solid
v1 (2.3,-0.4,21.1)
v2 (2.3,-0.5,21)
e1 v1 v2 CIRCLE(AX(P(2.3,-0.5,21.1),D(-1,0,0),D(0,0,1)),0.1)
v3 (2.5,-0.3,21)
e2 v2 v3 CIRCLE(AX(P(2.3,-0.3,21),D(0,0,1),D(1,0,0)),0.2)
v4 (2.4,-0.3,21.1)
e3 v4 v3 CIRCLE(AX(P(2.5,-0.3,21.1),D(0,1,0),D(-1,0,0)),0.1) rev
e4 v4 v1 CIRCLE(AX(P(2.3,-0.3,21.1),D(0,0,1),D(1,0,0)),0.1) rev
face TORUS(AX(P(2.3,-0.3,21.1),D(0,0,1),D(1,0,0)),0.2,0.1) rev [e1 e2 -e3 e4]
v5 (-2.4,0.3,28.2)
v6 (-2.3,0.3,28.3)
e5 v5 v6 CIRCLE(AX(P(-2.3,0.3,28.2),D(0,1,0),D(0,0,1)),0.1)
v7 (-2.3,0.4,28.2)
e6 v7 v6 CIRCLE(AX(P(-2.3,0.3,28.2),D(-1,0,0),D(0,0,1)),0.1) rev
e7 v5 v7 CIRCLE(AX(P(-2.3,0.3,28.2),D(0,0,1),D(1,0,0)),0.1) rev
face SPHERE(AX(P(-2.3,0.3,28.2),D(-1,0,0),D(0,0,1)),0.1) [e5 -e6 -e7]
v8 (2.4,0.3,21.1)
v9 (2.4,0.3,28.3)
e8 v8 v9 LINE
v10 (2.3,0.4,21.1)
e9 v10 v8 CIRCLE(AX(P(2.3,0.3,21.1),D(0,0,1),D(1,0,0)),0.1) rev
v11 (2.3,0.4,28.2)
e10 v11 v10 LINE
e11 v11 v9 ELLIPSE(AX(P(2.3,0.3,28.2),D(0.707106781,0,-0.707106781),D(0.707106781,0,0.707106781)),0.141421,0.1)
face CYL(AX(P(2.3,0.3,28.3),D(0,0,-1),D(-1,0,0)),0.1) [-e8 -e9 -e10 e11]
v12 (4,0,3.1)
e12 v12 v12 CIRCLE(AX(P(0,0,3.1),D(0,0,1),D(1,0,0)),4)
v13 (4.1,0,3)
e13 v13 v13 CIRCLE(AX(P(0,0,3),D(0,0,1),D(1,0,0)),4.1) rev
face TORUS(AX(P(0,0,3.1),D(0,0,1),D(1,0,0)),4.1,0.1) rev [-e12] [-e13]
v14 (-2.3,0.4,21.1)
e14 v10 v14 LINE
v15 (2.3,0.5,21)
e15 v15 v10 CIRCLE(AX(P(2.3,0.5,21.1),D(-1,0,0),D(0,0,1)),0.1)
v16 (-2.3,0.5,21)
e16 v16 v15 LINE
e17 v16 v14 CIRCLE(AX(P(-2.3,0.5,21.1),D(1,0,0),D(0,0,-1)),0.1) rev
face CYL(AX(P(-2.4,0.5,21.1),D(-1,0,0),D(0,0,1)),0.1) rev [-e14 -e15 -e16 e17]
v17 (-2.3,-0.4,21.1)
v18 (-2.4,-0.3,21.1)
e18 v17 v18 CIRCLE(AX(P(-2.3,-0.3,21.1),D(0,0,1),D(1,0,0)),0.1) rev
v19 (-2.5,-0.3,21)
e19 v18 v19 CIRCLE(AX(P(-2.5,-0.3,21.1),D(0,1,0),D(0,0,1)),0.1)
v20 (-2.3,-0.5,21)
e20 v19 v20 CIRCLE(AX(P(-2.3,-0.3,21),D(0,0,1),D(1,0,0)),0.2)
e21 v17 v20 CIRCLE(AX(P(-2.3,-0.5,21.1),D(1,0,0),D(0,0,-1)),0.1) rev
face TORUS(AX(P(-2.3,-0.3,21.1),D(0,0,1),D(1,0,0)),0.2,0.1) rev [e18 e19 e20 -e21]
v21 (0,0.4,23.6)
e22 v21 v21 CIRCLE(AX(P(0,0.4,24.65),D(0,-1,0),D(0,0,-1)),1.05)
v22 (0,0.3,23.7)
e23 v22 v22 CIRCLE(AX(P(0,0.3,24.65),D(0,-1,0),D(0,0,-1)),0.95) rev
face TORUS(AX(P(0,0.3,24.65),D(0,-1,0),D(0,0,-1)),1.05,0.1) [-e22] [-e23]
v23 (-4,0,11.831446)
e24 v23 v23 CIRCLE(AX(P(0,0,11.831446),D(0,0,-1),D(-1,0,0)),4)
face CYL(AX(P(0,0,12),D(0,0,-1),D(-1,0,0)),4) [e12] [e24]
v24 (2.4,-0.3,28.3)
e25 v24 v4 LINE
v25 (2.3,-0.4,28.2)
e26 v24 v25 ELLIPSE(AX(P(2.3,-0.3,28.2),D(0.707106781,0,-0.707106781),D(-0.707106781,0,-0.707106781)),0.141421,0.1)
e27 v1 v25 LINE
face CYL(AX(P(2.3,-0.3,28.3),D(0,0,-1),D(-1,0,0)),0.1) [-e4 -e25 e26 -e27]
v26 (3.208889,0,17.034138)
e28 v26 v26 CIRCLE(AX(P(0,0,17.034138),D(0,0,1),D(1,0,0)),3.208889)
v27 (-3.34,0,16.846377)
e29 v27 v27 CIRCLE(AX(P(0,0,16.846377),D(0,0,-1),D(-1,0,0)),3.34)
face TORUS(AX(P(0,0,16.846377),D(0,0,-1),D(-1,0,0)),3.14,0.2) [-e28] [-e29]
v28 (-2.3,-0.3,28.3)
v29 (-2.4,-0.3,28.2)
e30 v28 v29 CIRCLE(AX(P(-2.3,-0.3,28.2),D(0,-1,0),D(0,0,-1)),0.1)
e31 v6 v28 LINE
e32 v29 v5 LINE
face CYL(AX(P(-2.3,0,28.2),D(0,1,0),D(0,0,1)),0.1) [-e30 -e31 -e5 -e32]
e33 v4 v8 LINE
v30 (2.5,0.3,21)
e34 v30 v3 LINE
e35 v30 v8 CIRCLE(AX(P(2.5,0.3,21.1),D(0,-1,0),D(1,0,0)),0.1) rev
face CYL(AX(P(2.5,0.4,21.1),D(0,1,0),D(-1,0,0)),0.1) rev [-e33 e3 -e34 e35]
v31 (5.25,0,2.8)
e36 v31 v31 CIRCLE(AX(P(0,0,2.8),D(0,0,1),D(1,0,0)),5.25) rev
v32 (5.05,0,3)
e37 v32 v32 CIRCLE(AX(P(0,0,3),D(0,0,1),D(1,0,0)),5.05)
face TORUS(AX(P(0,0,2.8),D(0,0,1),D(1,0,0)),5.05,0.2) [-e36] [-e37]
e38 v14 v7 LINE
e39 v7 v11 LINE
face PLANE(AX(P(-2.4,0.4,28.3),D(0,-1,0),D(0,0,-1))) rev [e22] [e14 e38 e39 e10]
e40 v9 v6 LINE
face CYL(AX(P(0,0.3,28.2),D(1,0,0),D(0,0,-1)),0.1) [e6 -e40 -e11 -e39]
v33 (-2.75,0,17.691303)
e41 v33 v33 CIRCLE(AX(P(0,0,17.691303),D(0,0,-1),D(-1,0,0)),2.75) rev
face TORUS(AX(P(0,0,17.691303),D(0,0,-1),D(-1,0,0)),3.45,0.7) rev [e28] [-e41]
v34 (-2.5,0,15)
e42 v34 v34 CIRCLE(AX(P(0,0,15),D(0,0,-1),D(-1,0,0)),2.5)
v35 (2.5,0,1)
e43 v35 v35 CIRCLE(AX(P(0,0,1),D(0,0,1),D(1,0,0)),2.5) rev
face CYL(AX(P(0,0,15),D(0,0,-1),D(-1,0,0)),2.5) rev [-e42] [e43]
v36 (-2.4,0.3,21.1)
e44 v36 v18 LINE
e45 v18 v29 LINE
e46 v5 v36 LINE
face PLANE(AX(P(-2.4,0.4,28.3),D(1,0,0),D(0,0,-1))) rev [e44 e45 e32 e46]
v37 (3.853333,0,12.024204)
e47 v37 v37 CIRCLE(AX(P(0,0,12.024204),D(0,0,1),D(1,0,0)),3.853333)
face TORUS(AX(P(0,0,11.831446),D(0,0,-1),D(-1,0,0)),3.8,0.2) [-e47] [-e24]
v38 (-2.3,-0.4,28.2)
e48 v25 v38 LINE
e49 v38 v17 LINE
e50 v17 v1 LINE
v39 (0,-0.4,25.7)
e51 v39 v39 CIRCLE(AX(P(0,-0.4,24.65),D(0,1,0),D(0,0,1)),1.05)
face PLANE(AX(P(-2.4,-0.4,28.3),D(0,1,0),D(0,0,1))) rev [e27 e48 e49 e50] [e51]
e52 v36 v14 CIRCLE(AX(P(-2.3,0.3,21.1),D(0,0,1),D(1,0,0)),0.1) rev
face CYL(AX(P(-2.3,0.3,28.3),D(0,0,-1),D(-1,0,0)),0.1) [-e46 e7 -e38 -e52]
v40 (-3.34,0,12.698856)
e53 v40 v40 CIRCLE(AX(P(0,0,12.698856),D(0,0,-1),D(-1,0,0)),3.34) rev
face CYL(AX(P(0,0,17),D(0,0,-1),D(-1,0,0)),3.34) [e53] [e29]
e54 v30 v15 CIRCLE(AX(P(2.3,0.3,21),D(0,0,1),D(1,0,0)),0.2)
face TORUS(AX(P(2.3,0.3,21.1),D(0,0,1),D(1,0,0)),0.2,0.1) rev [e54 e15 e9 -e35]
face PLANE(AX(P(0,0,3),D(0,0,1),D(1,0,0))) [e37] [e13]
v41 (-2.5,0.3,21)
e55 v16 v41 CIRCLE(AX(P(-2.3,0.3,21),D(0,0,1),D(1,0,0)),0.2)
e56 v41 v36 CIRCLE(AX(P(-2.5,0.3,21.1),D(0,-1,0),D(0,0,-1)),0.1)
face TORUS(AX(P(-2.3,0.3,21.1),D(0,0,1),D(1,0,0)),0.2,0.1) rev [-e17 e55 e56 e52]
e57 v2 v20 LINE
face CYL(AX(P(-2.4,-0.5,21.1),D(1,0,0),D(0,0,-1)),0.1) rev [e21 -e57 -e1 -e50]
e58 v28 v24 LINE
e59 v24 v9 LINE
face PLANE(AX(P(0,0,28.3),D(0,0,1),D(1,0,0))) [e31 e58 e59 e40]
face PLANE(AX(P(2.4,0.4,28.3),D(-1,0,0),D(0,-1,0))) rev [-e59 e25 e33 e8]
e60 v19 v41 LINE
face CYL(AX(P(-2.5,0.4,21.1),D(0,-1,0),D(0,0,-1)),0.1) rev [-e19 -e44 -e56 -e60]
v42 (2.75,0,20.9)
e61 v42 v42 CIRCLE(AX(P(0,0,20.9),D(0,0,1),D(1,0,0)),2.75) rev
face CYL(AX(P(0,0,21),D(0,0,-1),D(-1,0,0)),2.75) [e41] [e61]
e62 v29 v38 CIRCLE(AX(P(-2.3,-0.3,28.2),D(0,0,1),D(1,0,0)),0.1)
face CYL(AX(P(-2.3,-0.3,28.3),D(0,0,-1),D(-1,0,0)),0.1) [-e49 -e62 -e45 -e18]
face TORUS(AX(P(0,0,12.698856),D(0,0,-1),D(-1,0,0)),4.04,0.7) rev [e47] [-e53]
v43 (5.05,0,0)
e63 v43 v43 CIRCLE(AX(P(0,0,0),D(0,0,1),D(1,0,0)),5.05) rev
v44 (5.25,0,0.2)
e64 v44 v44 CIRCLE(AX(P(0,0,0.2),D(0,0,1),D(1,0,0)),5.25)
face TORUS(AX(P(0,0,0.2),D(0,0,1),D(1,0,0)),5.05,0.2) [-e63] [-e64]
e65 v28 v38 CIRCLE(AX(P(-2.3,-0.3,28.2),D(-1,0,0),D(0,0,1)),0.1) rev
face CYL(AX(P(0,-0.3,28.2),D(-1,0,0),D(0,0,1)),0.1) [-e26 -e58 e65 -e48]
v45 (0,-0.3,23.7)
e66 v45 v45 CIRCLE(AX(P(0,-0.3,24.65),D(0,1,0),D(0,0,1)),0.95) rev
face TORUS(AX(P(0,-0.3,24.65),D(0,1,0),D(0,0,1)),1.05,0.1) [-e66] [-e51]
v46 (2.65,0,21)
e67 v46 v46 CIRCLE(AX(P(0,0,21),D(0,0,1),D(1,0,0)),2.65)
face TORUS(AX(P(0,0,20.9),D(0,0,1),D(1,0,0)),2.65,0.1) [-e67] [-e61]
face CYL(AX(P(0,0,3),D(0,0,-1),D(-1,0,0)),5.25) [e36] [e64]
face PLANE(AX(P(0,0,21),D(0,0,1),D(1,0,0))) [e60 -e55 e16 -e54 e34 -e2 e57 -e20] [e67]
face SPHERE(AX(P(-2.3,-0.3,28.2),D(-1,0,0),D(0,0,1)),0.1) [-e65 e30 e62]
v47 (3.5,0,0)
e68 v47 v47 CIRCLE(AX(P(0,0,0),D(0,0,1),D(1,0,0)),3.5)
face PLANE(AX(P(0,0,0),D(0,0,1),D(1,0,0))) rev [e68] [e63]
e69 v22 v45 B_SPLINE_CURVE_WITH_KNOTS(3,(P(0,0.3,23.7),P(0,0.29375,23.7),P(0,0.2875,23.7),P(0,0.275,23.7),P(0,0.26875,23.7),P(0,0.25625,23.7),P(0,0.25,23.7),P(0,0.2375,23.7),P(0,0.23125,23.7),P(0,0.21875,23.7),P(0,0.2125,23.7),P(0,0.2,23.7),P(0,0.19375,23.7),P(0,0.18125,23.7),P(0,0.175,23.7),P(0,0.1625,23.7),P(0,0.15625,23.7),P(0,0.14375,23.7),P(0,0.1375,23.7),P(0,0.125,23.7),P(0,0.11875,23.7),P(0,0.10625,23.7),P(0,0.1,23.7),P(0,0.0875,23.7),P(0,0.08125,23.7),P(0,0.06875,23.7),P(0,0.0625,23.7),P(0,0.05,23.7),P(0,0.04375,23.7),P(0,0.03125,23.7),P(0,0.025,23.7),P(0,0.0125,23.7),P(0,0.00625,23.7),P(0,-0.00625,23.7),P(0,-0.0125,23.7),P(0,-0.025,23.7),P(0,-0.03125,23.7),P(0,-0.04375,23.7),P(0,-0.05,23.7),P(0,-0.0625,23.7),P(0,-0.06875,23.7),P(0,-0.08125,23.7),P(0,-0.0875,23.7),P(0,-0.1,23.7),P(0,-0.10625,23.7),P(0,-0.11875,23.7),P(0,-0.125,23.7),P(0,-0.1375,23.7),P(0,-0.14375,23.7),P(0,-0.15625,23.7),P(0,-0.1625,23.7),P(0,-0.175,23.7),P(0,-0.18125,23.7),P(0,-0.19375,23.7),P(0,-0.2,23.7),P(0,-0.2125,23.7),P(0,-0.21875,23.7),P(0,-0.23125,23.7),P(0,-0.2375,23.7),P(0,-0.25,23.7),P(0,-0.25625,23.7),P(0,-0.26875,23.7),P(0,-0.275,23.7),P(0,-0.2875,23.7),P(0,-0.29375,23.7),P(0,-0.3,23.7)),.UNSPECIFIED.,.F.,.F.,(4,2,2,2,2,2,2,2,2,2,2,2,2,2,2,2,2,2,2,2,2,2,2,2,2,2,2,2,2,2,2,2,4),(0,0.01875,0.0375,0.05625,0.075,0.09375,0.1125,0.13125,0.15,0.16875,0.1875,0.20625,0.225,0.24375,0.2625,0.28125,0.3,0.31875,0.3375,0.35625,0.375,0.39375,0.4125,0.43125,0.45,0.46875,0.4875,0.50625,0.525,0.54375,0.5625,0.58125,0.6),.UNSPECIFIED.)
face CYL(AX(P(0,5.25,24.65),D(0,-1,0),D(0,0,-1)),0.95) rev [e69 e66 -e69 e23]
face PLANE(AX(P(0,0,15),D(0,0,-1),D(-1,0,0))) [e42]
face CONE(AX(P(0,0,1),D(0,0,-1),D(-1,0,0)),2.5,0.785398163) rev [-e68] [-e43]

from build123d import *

# Parameters (mm, degrees)
SKETCH2_R           = 5.25
BOSS_EXTRUDE1_DEPTH = 3
SKETCH3_R           = 4
BOSS_EXTRUDE2_DEPTH = 9
SKETCH4_R           = 3.34
BOSS_EXTRUDE3_DEPTH = 5
SKETCH5_R           = 2.75
BOSS_EXTRUDE4_DEPTH = 4
SKETCH6_W           = 4.8
SKETCH6_H           = 0.8
BOSS_EXTRUDE5_DEPTH = 7.3
SKETCH7_R           = 0.95
CUT_EXTRUDE1_DEPTH  = 30.332149597
SKETCH8_R           = 2.5
CUT_EXTRUDE2_DEPTH  = 15
FILLET1_R           = 0.1
FILLET2_R           = 0.1
FILLET3_R           = 0.7
FILLET5_R           = 0.2
FILLET6_R           = 0.2
CHAMFER1_SIZE       = 1


with BuildPart() as part:
    # Sketch2 → Boss-Extrude1 (new body)
    with BuildSketch(Plane.XY):
        Circle(SKETCH2_R)
    extrude(amount=BOSS_EXTRUDE1_DEPTH)

    # Sketch3 → Boss-Extrude2 (add)
    with BuildSketch(Plane.XY.offset(3)):
        Circle(SKETCH3_R)
    extrude(amount=BOSS_EXTRUDE2_DEPTH)

    # Sketch4 → Boss-Extrude3 (add)
    with BuildSketch(Plane.XY.offset(12)):
        Circle(SKETCH4_R)
    extrude(amount=BOSS_EXTRUDE3_DEPTH)

    # Sketch5 → Boss-Extrude4 (add)
    with BuildSketch(Plane.XY.offset(17)):
        Circle(SKETCH5_R)
    extrude(amount=BOSS_EXTRUDE4_DEPTH)

    # Sketch6 → Boss-Extrude5 (add)
    with BuildSketch(Plane.XY.offset(21)):
        Rectangle(SKETCH6_W, SKETCH6_H)
    extrude(amount=BOSS_EXTRUDE5_DEPTH)

    # Sketch7 → Cut-Extrude1 (cut, through all)
    with BuildSketch(Plane.XZ.offset(0.4)):
        with Locations(Location((0, 24.65, 0), (0, 0, 270))):
            Circle(SKETCH7_R)
    extrude(amount=-CUT_EXTRUDE1_DEPTH, mode=Mode.SUBTRACT)

    # Sketch8 → Cut-Extrude2 (cut)
    with BuildSketch(Plane(origin=(0, 0, 0), x_dir=(-1, 0, 0), z_dir=(0, 0, -1))):
        Circle(SKETCH8_R)
    extrude(amount=-CUT_EXTRUDE2_DEPTH, mode=Mode.SUBTRACT)

    # Fillet1
    fillet1_edges = [part.edges().sort_by_distance(p)[0] for p in [
        (-2.75, 0, 21),
        (2.4, 0, 21),
        (2.4, -0.4, 24.65),
        (0, 0.4, 21),
        (2.4, 0.4, 24.65),
        (-2.4, 0, 21),
        (-2.4, 0.4, 24.65),
        (0, -0.4, 21),
        (-2.4, -0.4, 24.65),
        (0, 0.4, 28.3),
        (-2.4, 0, 28.3),
        (0, -0.4, 28.3),
        (0, 0.4, 25.6),
        (0, -0.4, 25.6),
    ]]
    fillet(fillet1_edges, radius=FILLET1_R)

    # Fillet2
    fillet2_edges = [part.edges().sort_by_distance(p)[0] for p in [
        (-4, 0, 3),
    ]]
    fillet(fillet2_edges, radius=FILLET2_R)

    # Fillet3
    # the kernel refuses this fillet: 0.7 mm, written as the material it adds along each edge
    with BuildSketch(Plane(origin=(0, 0, 12), x_dir=(1, 0, 0), z_dir=(0, -1, 0))) as fillet3_piece_1:
        with BuildLine():
            CenterArc((4.04, 0.698856208), FILLET3_R, 180, 86.72417104)
            Line((3.34, 0.698856208), (3.326, 0.698856208))
            Line((3.326, 0.698856208), (3.326, 0))
            Line((3.326, 0), (3.34, -0.014))
            ThreePointArc((3.34, -0.014), (3.67, -0.014), (3.9992, -0.013977124))
            Line((3.9992, -0.013977124), (4, 0))
        make_face()
    revolve(axis=Axis((0, 0, 12), (0, 0, 1)))
    with BuildSketch(Plane(origin=(0, 0, 17), x_dir=(1, 0, 0), z_dir=(0, -1, 0))) as fillet3_piece_2:
        with BuildLine():
            CenterArc((3.45, 0.691303117), FILLET3_R, 180, 80.958903851)
            Line((2.75, 0.691303117), (2.736, 0.691303117))
            Line((2.736, 0.691303117), (2.736, 0))
            Line((2.736, 0), (2.75, -0.014))
            ThreePointArc((2.75, -0.014), (3.045, -0.014), (3.3378, -0.013826062))
            Line((3.3378, -0.013826062), (3.34, 0))
        make_face()
    revolve(axis=Axis((0, 0, 17), (0, 0, 1)))

    # Fillet5
    fillet5_edges = [part.edges().sort_by_distance(p)[0] for p in [
        (-3.34, 0, 17),
        (-4, 0, 12),
    ]]
    fillet(fillet5_edges, radius=FILLET5_R)

    # Fillet6
    fillet6_edges = [part.edges().sort_by_distance(p)[0] for p in [
        (-5.25, 0, 0),
        (-5.25, 0, 3),
    ]]
    fillet(fillet6_edges, radius=FILLET6_R)

    # Chamfer1
    chamfer1_edges = [part.edges().sort_by_distance(p)[0] for p in [
        (2.5, 0, 0),
    ]]
    chamfer(chamfer1_edges, length=CHAMFER1_SIZE)


solid = part.part
